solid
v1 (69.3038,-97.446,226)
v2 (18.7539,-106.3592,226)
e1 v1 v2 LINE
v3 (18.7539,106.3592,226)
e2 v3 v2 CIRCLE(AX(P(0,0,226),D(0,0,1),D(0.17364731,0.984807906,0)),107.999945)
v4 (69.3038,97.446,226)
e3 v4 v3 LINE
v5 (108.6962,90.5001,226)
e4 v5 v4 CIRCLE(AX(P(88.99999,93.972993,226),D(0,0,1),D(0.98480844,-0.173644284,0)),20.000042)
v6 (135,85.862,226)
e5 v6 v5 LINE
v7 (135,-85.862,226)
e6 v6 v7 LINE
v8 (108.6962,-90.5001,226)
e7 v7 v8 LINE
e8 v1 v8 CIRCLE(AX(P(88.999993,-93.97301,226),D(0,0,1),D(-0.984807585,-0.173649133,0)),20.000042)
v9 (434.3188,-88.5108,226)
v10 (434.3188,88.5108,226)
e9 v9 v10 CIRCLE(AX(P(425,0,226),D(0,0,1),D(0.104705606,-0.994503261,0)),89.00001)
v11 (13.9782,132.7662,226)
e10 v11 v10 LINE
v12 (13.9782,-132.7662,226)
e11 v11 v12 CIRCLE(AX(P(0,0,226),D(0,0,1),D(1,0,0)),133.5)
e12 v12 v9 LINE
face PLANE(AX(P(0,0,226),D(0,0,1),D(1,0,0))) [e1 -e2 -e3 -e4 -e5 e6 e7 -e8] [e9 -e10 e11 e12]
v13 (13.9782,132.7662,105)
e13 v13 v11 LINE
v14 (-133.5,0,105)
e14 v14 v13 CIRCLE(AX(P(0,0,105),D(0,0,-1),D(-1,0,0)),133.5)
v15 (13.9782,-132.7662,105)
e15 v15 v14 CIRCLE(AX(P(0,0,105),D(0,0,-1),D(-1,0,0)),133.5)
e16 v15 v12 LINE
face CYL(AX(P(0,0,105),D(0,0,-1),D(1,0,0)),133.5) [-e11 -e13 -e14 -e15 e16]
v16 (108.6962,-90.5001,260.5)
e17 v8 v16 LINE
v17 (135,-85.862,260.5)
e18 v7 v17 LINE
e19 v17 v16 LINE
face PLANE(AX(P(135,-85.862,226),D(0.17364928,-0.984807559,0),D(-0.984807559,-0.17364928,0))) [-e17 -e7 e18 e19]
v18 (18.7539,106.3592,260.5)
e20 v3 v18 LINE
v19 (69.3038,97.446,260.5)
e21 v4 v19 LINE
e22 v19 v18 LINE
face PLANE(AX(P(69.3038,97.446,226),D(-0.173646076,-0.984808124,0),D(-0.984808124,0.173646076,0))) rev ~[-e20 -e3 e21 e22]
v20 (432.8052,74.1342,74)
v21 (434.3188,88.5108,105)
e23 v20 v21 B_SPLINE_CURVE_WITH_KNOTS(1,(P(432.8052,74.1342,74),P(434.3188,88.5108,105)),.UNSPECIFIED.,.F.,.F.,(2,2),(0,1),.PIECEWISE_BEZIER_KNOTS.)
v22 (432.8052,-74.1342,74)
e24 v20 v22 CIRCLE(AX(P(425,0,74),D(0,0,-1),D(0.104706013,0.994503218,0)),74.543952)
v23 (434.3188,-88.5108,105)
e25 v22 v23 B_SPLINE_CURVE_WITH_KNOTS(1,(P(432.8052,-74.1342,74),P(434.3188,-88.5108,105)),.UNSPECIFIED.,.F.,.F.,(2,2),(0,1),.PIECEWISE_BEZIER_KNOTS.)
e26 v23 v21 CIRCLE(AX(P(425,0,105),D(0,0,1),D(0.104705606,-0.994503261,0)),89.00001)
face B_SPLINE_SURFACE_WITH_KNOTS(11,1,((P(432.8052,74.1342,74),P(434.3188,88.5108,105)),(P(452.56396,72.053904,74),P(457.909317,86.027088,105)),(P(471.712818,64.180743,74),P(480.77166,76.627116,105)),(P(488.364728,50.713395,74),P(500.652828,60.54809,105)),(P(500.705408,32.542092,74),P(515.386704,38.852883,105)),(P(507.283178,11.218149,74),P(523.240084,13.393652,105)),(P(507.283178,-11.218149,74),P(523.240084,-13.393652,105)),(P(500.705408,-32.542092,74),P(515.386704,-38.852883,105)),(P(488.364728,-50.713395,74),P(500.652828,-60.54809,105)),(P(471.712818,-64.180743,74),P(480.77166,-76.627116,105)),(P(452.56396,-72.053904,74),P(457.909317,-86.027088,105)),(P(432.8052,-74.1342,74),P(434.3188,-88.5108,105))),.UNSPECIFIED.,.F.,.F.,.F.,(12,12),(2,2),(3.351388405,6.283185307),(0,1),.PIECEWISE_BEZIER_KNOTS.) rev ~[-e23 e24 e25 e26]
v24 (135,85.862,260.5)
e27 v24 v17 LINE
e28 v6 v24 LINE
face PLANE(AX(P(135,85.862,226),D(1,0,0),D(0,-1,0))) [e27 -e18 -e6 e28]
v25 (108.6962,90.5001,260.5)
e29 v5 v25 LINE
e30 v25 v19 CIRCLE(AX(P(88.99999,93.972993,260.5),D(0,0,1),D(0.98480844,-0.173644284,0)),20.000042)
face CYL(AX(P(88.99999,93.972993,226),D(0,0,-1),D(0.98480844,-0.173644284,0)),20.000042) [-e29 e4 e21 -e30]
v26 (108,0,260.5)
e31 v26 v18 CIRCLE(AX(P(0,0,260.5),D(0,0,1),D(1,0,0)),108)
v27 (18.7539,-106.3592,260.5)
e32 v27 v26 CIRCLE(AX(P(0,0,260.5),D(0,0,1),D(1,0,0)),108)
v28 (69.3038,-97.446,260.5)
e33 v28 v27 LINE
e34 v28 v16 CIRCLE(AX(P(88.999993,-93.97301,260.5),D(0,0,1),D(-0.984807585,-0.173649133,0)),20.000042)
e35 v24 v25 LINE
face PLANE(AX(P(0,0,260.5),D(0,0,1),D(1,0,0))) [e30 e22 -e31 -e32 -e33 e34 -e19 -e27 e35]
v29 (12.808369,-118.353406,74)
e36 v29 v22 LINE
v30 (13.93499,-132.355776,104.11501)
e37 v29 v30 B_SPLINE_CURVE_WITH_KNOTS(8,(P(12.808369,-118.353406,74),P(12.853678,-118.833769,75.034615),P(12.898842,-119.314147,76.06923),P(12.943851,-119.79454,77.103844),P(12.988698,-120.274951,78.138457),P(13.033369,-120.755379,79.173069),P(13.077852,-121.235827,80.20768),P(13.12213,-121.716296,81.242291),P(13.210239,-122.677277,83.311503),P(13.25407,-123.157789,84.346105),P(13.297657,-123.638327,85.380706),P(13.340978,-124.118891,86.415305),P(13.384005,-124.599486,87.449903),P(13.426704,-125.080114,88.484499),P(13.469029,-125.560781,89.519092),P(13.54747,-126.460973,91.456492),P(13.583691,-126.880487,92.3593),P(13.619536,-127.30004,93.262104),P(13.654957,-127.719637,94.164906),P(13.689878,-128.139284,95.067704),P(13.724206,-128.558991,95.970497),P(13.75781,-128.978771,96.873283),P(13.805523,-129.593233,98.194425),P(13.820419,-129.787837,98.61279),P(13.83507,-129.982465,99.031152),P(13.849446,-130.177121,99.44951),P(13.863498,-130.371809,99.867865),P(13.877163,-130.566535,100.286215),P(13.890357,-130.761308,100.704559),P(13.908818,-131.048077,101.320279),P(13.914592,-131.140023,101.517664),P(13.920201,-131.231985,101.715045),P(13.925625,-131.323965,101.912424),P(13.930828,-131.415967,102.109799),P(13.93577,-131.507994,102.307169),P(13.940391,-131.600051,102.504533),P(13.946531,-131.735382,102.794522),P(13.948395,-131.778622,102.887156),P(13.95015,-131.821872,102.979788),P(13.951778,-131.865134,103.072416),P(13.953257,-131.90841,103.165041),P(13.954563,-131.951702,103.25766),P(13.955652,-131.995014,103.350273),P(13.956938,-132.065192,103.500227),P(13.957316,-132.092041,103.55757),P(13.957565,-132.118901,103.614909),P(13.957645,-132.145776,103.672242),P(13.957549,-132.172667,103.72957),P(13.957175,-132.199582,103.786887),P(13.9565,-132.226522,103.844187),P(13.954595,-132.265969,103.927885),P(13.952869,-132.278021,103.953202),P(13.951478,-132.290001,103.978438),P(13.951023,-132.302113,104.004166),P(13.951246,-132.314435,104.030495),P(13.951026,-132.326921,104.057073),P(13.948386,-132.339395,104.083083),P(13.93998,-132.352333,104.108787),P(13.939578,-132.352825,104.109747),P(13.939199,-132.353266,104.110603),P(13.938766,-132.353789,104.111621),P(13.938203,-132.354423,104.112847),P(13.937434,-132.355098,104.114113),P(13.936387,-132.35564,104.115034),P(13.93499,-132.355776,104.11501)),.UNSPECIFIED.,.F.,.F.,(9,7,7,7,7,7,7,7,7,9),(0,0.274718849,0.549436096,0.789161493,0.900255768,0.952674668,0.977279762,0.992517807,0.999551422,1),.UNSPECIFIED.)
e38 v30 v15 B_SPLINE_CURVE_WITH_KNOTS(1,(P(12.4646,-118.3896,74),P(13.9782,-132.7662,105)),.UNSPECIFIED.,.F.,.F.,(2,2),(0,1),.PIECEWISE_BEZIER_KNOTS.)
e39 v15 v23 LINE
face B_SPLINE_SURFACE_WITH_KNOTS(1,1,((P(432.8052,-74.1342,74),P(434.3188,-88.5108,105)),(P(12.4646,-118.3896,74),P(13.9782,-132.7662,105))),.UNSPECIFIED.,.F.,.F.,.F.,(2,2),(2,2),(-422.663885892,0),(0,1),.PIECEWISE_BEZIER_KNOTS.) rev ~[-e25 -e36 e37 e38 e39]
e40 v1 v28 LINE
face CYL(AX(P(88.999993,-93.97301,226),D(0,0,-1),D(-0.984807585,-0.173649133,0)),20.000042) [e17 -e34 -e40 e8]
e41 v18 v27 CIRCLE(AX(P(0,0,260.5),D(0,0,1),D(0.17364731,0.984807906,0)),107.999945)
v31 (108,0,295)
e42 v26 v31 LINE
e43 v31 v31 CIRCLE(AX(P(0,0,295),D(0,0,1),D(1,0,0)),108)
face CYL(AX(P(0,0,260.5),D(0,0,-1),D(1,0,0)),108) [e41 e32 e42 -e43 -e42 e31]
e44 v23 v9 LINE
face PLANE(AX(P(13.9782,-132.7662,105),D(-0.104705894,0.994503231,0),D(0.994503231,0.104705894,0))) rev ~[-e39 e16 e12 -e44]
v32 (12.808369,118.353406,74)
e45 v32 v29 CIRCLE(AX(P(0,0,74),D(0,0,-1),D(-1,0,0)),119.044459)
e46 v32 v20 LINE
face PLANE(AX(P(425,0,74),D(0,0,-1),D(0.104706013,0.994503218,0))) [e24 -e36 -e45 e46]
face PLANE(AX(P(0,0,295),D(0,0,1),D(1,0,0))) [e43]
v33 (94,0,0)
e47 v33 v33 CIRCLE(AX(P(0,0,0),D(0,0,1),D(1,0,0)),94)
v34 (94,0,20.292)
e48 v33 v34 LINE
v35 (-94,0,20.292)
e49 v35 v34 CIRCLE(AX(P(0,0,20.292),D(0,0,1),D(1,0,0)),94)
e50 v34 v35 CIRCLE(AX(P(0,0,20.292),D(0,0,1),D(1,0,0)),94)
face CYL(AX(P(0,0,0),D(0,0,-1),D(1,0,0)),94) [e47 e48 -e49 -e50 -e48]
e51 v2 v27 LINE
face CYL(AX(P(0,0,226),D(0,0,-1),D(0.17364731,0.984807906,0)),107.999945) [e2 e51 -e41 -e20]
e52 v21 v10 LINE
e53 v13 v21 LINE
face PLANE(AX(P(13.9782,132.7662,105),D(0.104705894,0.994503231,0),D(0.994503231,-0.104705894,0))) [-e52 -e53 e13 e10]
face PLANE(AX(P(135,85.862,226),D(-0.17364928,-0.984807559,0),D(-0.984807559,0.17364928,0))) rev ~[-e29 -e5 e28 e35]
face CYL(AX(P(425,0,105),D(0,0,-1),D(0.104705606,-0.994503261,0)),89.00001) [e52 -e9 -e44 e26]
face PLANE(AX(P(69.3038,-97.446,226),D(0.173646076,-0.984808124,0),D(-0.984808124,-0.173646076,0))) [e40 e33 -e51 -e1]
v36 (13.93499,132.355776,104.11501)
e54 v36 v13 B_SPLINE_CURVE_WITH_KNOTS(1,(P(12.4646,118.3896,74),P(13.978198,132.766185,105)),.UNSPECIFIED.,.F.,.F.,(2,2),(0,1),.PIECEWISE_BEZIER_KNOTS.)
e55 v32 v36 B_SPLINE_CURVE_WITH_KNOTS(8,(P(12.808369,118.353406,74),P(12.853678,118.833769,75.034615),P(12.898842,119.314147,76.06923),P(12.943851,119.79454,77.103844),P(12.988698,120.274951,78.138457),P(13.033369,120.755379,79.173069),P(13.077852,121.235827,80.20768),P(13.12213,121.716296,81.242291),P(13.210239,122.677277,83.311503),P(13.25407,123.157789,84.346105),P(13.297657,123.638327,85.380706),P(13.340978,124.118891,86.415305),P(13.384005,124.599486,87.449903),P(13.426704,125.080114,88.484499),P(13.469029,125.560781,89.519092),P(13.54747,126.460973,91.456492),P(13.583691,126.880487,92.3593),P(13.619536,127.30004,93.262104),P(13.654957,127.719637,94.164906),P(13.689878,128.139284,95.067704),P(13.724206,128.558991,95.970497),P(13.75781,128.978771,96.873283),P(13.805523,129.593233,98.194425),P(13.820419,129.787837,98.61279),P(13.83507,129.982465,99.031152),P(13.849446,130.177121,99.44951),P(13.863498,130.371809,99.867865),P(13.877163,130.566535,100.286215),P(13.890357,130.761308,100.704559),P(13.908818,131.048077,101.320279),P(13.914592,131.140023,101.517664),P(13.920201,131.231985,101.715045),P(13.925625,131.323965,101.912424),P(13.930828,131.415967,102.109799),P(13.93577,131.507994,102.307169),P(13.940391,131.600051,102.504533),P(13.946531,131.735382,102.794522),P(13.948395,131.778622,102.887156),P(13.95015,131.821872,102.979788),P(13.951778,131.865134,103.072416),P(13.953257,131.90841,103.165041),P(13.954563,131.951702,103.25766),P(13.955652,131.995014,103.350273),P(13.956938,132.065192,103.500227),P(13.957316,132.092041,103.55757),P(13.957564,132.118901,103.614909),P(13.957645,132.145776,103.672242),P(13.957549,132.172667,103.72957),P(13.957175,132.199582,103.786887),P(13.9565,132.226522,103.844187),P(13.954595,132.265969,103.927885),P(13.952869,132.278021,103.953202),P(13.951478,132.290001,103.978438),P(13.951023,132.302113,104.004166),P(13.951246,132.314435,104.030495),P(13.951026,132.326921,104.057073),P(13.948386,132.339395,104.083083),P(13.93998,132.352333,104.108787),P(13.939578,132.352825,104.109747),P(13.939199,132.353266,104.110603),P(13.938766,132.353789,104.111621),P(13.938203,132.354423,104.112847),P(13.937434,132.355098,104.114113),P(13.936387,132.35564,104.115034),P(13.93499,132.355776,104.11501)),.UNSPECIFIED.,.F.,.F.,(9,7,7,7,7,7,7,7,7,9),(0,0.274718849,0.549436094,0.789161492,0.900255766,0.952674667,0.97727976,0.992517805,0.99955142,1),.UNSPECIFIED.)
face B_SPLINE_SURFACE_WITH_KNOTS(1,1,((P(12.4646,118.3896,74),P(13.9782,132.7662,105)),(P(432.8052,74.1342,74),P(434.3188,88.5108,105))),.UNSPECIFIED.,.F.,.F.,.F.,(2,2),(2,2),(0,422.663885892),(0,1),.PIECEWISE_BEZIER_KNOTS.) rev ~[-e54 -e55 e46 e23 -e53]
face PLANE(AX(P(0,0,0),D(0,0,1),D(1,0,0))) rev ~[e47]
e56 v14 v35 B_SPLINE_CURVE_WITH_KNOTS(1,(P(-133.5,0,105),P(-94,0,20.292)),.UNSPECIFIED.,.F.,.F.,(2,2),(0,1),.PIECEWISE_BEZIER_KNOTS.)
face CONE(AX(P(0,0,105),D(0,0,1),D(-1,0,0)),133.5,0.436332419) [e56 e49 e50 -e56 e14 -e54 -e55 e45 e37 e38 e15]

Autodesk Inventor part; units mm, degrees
ref_plane "YZ Plane" through (0, 0, 0) normal (1, 0, 0) x (0, 1, 0)
sketch "Sketch1" plane through (0, 0, 0) normal (0, 0, 1) x (1, 0, 0)
  circle A0 centre (0, 0) radius 94
  dimension "d0" = 188
extrude "Extrusion1" add sketch "Sketch1" along normal blind 20.292
ref_plane "Work Plane1" through (0, 0, 105) normal (0, 0, -1) x (-1, 0, 0)
sketch "Sketch2" plane through (0, 0, 105) normal (0, 0, -1) x (-1, 0, 0)
  circle A0 centre (0, 0) radius 133.5
  dimension "d4" = 267
loft "Loft1" add profiles "Sketch2" section 2 edges at (-94, 0, 20.292)
sketch "Sketch3" plane through (0, 0, 105) normal (0, 0, 1) x (1, 0, 0)
  circle A0 centre (0, 0) radius 133.5 construction
  circle A1 centre (425, 0) radius 89 construction
  line L0 (13.9782, 132.7662) -> (434.3188, 88.5108)
  circle A2 centre (0, 0) radius 133.5 projected
  line L1 (13.9782, -132.7662) -> (434.3188, -88.5108)
  arc A3 (13.9782, 132.7662) -> (13.9782, -132.7662) centre (0, 0) ccw
  arc A4 (434.3188, -88.5108) -> (434.3188, 88.5108) centre (425, 0) ccw
  dimension "d9" = 178
  dimension "d10" = 425
extrude "Extrusion2" add sketch "Sketch3" along normal blind 121
ref_plane "Work Plane2" through (0, 0, 74) normal (0, 0, -1) x (-1, 0, 0)
sketch "Sketch4" plane through (0, 0, 74) normal (0, 0, -1) x (-1, 0, 0)
  arc A0 (-434.3188, 88.5108) -> (-434.3188, -88.5108) centre (-425, 0) ccw construction
  circle A1 centre (-425, 0) radius 74.544 construction
  circle A2 centre (0, 0) radius 119.044 construction
  line L0 (-12.4646, -118.3896) -> (-432.8052, -74.1342)
  line L1 (-12.4646, 118.3896) -> (-432.8052, 74.1342)
  line L2 (-13.9782, -132.7662) -> (-434.3188, -88.5108) projected
  line L3 (-434.3188, 88.5108) -> (-13.9782, 132.7662) projected
  arc A3 (-12.4646, -118.3896) -> (-12.4646, 118.3896) centre (0, 0) ccw
  arc A4 (-432.8052, 74.1342) -> (-432.8052, -74.1342) centre (-425, 0) ccw
  dimension "d14" = 149.088
  dimension "d15" = 238.088
loft "Loft2" add profiles "Sketch4" section 2 edges at (133.5, 0, 105) (224.1485, 110.6385, 105) (514, 0, 105) (224.1485, -110.6385, 105)
sketch "Sketch7" plane through (0, 0, 226) normal (0, 0, 1) x (1, 0, 0)
  circle A0 centre (0, 0) radius 108 construction
  line L0 (135, 85.862) -> (135, -85.862)
  line L1 (135, -85.862) -> (135, 85.862) construction
  line L2 (18.7539, 106.3592) -> (135, 85.862) construction
  line L3 (135, -85.862) -> (18.7539, -106.3592) construction
  circle A1 centre (89, 93.973) radius 20 construction
  circle A2 centre (89, -93.973) radius 20 construction
  line L4 (135, 85.862) -> (108.6962, 90.5001)
  line L5 (135, -85.862) -> (108.6962, -90.5001)
  arc A3 (69.3038, -97.446) -> (108.6962, -90.5001) centre (89, -93.973) ccw
  arc A4 (108.6962, 90.5001) -> (69.3038, 97.446) centre (89, 93.973) ccw
  line L6 (69.3038, 97.446) -> (18.7539, 106.3592)
  line L7 (69.3038, -97.446) -> (18.7539, -106.3592)
  arc A5 (18.7539, 106.3592) -> (18.7539, -106.3592) centre (0, 0) ccw
  point P0 (135, 0)
  dimension "d33" = 40
  dimension "d30" = 216
  dimension "d31" = 171.724
  dimension "d32" = 135
  dimension "d34" = 89
extrude "Extrusion5" add sketch "Sketch7" along normal blind 34.5
sketch "Sketch8" plane through (0, 0, 260.5) normal (0, 0, 1) x (1, 0, 0)
  circle A0 centre (0, 0) radius 108
  arc A1 (18.7539, 106.3592) -> (18.7539, -106.3592) centre (0, 0) ccw construction
  point P0 (-108, 0)
extrude "Extrusion6" add sketch "Sketch8" along normal blind 34.5
properties part number "1"
